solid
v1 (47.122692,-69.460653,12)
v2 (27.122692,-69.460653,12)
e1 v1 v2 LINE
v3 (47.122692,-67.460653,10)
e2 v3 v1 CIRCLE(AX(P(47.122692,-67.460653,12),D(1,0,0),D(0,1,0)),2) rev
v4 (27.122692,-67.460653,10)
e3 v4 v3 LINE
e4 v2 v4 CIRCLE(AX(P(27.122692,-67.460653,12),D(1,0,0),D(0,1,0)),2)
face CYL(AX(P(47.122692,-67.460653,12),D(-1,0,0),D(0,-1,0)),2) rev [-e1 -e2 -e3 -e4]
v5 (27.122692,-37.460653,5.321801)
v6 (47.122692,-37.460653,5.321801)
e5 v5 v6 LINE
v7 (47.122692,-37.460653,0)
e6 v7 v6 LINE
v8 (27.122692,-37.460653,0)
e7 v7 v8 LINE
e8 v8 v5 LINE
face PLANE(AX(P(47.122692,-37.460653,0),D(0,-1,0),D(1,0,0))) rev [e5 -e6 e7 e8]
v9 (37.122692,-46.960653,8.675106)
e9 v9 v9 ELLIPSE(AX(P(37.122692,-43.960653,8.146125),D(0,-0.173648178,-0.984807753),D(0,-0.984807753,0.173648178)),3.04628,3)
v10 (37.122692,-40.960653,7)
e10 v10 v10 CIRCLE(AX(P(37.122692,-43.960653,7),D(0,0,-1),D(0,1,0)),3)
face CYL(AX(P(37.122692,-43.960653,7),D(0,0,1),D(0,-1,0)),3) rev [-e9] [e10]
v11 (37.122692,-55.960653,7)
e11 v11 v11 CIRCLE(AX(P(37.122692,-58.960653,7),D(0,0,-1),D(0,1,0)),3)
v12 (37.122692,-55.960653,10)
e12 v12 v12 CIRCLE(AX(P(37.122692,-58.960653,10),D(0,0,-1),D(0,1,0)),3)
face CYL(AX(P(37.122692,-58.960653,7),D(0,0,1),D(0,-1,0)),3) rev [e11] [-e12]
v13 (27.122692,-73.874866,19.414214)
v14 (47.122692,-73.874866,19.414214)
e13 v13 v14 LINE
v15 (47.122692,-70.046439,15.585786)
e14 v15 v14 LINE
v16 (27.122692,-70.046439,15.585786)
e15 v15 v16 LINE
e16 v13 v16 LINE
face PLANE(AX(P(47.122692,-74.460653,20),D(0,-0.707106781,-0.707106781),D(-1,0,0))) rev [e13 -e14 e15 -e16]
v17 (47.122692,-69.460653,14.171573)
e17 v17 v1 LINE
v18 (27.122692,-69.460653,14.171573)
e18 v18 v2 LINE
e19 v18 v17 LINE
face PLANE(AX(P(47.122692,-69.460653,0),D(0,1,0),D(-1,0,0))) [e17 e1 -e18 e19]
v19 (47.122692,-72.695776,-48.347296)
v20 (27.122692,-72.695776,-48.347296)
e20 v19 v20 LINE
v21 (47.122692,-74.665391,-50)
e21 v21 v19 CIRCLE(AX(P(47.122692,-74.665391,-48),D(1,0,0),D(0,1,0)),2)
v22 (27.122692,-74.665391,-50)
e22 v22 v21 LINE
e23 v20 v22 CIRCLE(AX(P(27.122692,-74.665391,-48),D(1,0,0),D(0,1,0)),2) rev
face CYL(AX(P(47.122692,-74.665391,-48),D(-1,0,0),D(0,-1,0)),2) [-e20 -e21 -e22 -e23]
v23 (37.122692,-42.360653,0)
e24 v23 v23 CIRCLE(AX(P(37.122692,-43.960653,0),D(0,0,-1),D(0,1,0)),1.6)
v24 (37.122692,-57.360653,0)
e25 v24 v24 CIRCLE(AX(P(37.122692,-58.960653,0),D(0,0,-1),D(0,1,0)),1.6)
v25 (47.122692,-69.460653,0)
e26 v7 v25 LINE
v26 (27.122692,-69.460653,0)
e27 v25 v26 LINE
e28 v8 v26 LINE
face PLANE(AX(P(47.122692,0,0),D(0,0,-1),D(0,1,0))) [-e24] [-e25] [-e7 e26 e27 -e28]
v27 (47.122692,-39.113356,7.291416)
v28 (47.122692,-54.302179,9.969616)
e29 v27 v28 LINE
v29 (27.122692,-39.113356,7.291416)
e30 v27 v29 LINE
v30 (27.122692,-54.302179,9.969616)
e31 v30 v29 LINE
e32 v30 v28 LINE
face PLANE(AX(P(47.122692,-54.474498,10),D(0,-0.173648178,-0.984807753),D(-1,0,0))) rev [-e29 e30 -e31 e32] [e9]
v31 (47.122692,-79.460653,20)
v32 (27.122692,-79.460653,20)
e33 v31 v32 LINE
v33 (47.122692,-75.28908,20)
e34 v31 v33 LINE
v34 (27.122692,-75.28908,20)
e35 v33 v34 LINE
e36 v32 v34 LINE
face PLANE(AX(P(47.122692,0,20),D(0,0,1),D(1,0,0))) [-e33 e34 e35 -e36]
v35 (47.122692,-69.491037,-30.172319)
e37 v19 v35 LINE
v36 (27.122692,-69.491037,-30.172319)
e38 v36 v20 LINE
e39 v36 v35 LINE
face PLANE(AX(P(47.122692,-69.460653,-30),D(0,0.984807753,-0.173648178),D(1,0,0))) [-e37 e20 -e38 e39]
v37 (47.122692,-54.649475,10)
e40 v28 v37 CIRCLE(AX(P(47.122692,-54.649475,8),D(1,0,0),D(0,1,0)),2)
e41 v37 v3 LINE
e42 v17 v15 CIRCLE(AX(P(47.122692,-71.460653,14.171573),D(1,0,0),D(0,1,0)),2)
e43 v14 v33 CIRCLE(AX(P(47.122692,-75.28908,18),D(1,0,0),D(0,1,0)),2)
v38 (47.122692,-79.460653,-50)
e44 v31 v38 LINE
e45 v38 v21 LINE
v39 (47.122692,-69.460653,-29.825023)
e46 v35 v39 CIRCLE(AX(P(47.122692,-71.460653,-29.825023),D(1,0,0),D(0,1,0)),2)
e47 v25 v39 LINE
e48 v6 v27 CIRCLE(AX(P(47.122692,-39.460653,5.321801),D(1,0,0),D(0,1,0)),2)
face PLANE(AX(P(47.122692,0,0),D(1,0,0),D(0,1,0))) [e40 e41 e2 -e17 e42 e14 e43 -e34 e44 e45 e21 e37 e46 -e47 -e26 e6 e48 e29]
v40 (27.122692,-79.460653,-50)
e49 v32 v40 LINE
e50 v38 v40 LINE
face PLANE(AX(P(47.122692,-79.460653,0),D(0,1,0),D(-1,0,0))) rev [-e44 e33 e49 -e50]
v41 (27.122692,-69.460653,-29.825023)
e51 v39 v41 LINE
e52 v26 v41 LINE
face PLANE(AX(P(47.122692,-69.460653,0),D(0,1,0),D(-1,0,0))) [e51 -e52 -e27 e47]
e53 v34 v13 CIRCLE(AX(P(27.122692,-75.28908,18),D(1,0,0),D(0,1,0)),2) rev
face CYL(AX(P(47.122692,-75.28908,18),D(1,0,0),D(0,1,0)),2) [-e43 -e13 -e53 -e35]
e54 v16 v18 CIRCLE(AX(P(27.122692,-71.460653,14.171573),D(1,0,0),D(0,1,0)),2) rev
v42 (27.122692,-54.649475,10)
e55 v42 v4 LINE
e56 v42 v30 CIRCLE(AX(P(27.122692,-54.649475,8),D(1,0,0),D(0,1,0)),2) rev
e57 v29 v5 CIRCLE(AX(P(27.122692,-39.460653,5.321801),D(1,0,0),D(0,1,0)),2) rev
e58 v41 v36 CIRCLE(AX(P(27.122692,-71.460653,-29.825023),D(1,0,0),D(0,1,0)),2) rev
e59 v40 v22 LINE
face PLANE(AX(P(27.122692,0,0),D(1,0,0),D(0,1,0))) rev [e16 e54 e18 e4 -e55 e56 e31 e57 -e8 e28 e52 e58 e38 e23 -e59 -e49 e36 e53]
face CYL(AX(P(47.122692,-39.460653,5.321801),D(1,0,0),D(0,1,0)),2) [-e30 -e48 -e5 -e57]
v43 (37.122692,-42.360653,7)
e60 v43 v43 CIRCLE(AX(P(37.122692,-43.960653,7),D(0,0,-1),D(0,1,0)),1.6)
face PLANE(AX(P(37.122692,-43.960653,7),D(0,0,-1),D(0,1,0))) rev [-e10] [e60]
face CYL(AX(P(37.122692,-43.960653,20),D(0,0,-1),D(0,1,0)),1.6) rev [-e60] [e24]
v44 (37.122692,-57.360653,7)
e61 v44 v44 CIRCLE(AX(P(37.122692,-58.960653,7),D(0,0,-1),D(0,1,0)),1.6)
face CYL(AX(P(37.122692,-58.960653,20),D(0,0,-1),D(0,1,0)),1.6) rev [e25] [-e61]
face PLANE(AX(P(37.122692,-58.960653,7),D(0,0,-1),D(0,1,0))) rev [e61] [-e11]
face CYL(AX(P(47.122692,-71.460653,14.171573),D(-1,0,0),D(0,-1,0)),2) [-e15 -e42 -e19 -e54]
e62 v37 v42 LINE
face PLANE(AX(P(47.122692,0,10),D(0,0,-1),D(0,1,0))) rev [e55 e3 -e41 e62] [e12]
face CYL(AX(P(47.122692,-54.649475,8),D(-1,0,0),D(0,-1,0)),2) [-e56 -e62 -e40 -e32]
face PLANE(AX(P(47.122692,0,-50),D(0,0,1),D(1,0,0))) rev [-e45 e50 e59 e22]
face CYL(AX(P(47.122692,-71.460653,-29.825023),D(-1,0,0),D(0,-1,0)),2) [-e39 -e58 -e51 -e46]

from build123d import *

# Parameters (mm, degrees)
SKETCH3_W           = 10
SKETCH3_H           = 32
BOSS_EXTRUDE1_DEPTH = 10
SKETCH4_R           = 1.6
CUT_EXTRUDE1_DEPTH  = 106.045434916
CUT_EXTRUDE2_START  = -7
SKETCH4_3_R         = 3
SKETCH4_3_R_2       = 1.6
CUT_EXTRUDE2_DEPTH  = 3
CHAMFER1_SIZE       = 20
CHAMFER1_SIZE2      = 3.526539614
CHAMFER2_SIZE       = 5
CHAMFER3_SIZE       = 17.013845459
CHAMFER3_SIZE_2     = 3
FILLET1_R           = 2


with BuildPart() as part:
    # Sketch3 → Boss-Extrude1 (new, symmetric)
    with BuildSketch(Plane(origin=(37.122691811, 0, 0), x_dir=(0, 0, -1), z_dir=(1, 0, 0))):
        Polygon((50, -69.46065261), (0, -69.46065261), (-10, -69.46065261), (-20, -69.46065261), (-20, -79.46065261), (50, -79.46065261), align=None)
        with Locations((-5, -53.46065261)):
            Rectangle(SKETCH3_W, SKETCH3_H)
    extrude(amount=BOSS_EXTRUDE1_DEPTH, both=True)

    # Sketch4 → Cut-Extrude1 (cut, through all)
    with BuildSketch(Plane(origin=(0, 0, 0), x_dir=(-1, 0, 0), z_dir=(0, 0, -1))):
        with Locations(Location((-37.122691811, -43.96065261, 0), (0, 0, 90))):
            Circle(SKETCH4_R)
        with Locations(Location((-37.122691811, -58.96065261, 0), (0, 0, 90))):
            Circle(SKETCH4_R)
    extrude(amount=-CUT_EXTRUDE1_DEPTH, mode=Mode.SUBTRACT)

    # Sketch4<3> → Cut-Extrude2 (cut)
    # profile 1 of 2: a face of its own
    with BuildSketch(Plane(origin=(0, 0, 0), x_dir=(-1, 0, 0), z_dir=(0, 0, -1)).offset(CUT_EXTRUDE2_START)):
        with Locations(Location((-37.122691811, -43.96065261, 0), (0, 0, 90))):
            Circle(SKETCH4_3_R)
        with Locations(Location((-37.122691811, -43.96065261, 0), (0, 0, 90))):
            Circle(SKETCH4_3_R_2, mode=Mode.SUBTRACT)
    # profile 2 of 2: a face of its own
    with BuildSketch(Plane(origin=(0, 0, 0), x_dir=(-1, 0, 0), z_dir=(0, 0, -1)).offset(CUT_EXTRUDE2_START)):
        with Locations(Location((-37.122691811, -58.96065261, 0), (0, 0, 90))):
            Circle(SKETCH4_3_R)
        with Locations(Location((-37.122691811, -58.96065261, 0), (0, 0, 90))):
            Circle(SKETCH4_3_R_2, mode=Mode.SUBTRACT)
    extrude(amount=-CUT_EXTRUDE2_DEPTH, mode=Mode.SUBTRACT)

    # Chamfer1
    chamfer1_edges = [part.edges().sort_by_distance(p)[0] for p in [
        (37.122691811, -69.46065261, -50),
    ]]
    chamfer1_side = [part.faces().sort_by_distance(p)[0] for p in [
        (37.122691811, -69.46065261, -25),
    ]]
    chamfer(chamfer1_edges, length=CHAMFER1_SIZE, length2=CHAMFER1_SIZE2, reference=chamfer1_side[0])

    # Chamfer2
    chamfer2_edges = [part.edges().sort_by_distance(p)[0] for p in [
        (37.122691811, -69.46065261, 20),
    ]]
    chamfer(chamfer2_edges, length=CHAMFER2_SIZE)

    # Chamfer3
    # the kernel refuses this chamfer: 17.013845459, 3 mm, written as the material it takes off along each edge
    with BuildSketch(Plane(origin=(-17.08844569, -37.46065261, 10), x_dir=(0, -0.9999776716360548, 0.006682531656101368), z_dir=(1, 0, 0))) as chamfer3_piece_1:
        Polygon((CHAMFER3_SIZE * 0.999977671627, CHAMFER3_SIZE * 0.00668253165604), (-CHAMFER3_SIZE_2 * 0.0066825316561, CHAMFER3_SIZE_2 * 0.999977671636), (0, 0), align=None)
    extrude(amount=108.422275002, mode=Mode.SUBTRACT)

    # Fillet1
    fillet1_edges = [part.edges().sort_by_distance(p)[0] for p in [
        (37.122691811, -69.46065261, 10),
        (37.122691811, -69.46065261, -30),
        (37.122691811, -72.987192224, -50),
        (37.122691811, -74.46065261, 20),
        (37.122691811, -69.46065261, 15),
        (37.122691811, -54.474498068, 10),
        (37.122691811, -37.46065261, 7),
    ]]
    fillet(fillet1_edges, radius=FILLET1_R)


solid = part.part
